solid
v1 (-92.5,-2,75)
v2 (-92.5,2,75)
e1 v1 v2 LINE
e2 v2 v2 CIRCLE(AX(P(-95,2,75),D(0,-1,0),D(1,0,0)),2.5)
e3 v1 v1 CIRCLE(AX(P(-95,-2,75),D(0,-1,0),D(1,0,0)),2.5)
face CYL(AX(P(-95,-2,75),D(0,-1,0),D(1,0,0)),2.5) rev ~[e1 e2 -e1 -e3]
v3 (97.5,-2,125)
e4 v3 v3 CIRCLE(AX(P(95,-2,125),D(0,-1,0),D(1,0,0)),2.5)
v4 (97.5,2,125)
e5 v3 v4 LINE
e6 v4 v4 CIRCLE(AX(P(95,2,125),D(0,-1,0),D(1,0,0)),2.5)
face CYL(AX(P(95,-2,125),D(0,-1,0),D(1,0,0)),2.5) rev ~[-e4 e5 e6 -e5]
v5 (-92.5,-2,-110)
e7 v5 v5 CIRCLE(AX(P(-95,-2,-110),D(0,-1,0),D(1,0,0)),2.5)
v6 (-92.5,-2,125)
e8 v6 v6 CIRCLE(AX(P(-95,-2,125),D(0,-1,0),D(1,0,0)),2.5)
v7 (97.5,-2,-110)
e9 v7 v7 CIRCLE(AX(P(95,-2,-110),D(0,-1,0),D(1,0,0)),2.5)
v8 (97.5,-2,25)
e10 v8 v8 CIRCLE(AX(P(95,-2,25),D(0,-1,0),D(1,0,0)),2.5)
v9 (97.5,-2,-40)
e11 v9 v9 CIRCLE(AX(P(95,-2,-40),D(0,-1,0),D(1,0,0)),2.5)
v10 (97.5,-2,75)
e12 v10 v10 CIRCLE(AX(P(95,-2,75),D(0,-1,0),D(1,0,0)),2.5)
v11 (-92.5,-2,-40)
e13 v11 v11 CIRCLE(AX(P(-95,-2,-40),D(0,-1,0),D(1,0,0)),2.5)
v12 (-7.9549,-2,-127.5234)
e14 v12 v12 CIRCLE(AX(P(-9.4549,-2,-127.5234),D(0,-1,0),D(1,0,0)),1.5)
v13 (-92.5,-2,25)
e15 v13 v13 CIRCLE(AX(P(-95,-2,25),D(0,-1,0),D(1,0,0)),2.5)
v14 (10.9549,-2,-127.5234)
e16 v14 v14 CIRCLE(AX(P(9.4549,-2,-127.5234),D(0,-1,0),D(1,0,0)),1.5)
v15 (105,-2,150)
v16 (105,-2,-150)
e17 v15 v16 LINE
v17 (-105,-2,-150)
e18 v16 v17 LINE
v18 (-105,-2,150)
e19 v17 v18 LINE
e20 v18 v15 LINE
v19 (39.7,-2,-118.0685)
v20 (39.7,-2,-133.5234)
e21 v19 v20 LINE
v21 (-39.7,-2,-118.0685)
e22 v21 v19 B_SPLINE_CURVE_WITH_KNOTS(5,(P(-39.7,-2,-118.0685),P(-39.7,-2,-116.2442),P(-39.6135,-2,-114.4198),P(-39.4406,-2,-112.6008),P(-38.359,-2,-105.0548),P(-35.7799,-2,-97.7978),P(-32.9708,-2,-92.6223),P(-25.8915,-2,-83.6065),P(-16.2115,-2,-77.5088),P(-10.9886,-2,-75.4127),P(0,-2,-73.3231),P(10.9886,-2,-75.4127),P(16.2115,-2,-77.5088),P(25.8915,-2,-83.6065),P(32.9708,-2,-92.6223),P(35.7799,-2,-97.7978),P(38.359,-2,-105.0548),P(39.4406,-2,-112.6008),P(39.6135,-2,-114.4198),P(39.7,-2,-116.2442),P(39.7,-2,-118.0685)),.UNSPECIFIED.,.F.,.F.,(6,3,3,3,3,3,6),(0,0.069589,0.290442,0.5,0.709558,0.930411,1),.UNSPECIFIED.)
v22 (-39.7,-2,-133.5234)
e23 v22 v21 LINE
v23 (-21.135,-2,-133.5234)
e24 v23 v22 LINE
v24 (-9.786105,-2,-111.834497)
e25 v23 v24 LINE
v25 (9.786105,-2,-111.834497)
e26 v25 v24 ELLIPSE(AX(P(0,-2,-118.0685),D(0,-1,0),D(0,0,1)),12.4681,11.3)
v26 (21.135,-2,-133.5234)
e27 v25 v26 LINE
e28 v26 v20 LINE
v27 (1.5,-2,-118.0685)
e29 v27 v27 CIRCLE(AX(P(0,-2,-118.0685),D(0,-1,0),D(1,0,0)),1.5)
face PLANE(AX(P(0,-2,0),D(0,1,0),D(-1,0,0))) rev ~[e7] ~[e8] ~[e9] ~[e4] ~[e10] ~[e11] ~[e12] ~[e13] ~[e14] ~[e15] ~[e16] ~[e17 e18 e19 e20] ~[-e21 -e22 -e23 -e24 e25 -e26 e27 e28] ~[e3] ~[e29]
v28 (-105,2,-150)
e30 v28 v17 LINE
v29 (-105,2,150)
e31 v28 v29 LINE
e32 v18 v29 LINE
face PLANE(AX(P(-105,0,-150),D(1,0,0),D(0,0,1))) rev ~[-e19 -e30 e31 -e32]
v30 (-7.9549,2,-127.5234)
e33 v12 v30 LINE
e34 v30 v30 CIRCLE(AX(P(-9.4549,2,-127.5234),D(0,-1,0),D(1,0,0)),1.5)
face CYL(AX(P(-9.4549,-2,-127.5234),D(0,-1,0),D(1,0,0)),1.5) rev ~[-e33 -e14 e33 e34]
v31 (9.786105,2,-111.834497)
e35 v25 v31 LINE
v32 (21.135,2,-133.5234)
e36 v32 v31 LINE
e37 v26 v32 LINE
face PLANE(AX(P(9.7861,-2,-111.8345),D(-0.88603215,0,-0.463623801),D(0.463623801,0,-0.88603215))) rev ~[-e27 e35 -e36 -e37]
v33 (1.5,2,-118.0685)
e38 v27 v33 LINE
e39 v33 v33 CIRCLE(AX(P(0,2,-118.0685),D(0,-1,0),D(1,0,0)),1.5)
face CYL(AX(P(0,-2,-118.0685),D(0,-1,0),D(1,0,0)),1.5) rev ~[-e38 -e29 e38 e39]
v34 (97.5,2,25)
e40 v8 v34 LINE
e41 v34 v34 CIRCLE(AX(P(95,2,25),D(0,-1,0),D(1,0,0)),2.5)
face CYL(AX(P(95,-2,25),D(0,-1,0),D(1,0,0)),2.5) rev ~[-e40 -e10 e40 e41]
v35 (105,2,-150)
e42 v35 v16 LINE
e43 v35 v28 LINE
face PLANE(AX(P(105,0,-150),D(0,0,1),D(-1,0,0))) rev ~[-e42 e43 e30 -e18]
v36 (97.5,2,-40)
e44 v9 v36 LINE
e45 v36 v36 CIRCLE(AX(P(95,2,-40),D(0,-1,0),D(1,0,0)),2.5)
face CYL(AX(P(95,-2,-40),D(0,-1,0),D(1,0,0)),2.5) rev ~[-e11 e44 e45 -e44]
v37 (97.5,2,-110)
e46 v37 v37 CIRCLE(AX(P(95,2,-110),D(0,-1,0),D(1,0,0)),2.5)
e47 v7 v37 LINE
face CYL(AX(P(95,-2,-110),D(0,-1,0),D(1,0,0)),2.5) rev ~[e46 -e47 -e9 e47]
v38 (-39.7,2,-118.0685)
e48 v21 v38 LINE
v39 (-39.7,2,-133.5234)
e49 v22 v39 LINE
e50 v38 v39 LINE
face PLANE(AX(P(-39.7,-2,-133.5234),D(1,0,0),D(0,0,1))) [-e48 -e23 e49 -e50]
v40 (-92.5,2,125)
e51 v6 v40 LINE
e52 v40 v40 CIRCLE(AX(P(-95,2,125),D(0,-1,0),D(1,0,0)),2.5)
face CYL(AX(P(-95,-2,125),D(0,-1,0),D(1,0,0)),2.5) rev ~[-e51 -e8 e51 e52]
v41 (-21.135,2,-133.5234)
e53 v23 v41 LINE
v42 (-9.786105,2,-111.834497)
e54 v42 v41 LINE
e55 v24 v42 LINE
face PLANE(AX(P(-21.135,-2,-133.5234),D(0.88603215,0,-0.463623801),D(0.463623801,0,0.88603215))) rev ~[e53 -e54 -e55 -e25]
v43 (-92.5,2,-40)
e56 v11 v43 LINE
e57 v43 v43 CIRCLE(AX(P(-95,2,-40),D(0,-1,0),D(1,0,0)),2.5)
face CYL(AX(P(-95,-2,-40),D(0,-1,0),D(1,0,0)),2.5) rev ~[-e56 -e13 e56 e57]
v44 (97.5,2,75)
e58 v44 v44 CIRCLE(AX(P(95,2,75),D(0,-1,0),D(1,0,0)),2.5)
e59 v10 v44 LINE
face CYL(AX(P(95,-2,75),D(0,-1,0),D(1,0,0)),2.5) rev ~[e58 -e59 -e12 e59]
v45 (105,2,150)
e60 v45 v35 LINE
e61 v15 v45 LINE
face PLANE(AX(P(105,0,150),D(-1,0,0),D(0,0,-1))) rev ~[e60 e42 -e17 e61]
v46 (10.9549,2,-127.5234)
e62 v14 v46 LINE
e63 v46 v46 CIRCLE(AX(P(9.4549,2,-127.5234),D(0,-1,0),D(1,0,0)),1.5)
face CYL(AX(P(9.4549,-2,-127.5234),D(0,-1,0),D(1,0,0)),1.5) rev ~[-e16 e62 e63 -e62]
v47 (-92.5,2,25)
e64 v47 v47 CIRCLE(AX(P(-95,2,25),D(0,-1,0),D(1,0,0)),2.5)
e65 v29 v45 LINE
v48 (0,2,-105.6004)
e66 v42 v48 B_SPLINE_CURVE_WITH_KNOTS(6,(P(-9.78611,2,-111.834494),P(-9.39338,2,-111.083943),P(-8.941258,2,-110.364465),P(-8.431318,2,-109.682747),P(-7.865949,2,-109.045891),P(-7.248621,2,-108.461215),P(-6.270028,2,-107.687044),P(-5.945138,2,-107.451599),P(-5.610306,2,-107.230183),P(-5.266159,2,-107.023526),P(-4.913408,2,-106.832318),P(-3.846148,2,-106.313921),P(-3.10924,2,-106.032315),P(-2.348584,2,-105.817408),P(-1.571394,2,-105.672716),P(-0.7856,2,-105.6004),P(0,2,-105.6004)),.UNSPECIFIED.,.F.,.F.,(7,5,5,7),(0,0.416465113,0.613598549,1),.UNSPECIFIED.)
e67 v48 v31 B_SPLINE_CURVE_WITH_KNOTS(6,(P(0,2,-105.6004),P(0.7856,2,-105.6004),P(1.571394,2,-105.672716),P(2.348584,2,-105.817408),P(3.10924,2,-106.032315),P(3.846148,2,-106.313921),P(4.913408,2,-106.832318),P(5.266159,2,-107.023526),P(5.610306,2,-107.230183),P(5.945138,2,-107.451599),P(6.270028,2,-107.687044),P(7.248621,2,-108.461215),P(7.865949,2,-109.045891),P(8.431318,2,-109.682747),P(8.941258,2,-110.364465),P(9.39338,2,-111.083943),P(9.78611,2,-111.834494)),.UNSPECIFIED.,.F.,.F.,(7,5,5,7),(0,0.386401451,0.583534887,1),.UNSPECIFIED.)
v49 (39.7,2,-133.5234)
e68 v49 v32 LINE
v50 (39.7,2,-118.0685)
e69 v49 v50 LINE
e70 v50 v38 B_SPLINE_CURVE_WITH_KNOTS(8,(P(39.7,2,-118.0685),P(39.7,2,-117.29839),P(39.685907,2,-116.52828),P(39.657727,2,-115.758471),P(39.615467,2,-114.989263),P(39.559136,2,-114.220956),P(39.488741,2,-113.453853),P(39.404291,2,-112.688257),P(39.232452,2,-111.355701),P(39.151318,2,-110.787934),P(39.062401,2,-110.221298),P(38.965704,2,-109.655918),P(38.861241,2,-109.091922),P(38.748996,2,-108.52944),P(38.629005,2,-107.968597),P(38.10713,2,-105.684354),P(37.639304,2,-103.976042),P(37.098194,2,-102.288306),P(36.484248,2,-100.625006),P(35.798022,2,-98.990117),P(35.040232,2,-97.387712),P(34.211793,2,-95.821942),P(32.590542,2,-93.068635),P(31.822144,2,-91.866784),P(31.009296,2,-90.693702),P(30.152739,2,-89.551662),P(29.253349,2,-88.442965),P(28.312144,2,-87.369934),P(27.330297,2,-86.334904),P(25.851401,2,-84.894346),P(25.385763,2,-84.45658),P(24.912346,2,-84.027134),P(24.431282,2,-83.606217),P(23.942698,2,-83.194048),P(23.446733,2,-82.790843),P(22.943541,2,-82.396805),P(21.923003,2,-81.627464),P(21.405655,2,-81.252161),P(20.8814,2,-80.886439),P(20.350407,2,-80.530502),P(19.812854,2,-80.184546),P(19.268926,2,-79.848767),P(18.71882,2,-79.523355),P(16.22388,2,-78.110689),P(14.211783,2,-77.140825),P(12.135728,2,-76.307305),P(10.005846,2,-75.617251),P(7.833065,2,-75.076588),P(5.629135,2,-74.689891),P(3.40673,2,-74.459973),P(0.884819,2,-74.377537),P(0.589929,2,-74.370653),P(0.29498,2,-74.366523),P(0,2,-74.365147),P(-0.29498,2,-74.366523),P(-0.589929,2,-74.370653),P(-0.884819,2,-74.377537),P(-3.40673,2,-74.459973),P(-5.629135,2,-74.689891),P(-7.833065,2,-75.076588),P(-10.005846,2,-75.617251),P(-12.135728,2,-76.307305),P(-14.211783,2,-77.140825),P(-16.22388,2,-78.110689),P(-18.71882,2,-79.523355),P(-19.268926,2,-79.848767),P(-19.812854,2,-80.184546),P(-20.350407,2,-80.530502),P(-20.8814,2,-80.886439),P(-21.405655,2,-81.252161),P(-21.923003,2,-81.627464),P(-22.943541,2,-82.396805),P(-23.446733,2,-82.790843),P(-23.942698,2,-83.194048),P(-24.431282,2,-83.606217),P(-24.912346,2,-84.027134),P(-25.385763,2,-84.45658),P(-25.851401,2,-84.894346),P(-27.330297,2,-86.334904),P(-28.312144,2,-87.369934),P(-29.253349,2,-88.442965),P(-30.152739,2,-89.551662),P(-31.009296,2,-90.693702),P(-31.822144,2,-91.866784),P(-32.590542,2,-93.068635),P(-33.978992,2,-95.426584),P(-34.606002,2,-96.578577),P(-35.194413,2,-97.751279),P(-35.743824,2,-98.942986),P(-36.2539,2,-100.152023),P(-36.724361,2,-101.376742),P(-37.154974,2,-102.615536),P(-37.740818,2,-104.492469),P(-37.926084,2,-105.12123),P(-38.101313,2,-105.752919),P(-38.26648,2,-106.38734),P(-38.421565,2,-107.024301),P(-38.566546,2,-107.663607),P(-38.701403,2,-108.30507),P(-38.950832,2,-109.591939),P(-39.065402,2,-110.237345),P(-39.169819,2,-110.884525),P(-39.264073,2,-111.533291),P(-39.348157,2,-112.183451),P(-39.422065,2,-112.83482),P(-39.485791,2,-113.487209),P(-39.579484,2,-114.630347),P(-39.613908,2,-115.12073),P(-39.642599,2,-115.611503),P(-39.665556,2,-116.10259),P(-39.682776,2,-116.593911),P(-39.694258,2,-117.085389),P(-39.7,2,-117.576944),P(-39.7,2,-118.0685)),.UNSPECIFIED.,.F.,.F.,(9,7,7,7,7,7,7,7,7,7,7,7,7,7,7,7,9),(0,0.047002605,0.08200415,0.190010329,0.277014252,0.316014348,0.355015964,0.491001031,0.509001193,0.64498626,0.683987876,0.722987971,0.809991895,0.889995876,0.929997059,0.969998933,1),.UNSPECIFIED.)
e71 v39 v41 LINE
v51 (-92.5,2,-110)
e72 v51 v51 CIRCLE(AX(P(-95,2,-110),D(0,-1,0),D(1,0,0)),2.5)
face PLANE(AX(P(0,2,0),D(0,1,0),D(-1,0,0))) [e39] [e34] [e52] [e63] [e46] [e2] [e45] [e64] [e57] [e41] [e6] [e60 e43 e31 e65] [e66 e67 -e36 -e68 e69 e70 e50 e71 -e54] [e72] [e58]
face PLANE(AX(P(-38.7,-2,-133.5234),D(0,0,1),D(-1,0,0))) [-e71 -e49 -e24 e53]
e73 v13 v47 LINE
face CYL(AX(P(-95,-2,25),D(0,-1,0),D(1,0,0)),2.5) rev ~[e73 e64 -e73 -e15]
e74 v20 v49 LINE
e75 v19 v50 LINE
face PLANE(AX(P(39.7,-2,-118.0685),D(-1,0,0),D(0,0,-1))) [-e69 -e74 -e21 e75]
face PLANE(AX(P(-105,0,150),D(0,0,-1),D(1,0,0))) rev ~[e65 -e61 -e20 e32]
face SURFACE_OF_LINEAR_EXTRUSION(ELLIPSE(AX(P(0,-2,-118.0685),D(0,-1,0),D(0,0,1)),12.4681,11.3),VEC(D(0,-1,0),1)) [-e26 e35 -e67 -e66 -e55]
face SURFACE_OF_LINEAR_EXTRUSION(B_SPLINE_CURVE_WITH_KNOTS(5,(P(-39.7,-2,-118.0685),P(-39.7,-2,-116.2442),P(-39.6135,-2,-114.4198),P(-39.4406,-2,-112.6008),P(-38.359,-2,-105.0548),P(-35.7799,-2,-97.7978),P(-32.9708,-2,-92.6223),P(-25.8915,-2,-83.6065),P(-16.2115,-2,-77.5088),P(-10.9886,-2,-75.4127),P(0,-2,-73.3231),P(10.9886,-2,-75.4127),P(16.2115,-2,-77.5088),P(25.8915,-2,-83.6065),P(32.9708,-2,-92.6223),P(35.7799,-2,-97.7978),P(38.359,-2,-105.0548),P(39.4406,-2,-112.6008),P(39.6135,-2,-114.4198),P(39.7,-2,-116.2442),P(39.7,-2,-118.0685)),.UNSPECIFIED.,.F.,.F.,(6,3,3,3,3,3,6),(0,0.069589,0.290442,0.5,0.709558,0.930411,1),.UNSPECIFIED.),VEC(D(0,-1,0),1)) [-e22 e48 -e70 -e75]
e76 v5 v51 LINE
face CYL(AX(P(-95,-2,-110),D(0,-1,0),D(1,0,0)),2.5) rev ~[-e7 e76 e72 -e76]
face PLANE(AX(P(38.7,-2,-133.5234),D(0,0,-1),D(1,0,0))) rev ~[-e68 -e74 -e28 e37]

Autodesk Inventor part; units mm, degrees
sketch "Эскиз2" plane through (0, 0, 0) normal (0, 1, 0) x (-1, 0, 0)
  line L0 (105, 150) -> (-105, 150)
  line L1 (-105, 150) -> (-105, -150)
  line L2 (-105, -150) -> (105, -150)
  line L3 (105, -150) -> (105, 150)
  line L4 (105, 150) -> (-105, -150) construction
  line L5 (-105, 150) -> (105, -150) construction
  point P0 (0, 0)
  dimension "d0" = 300
  dimension "d1" = 210
extrude "Выдавливание1" add sketch "Эскиз2" along normal mid plane 4
sketch "Эскиз4" plane through (0, 2, 0) normal (0, 1, 0) x (1, 0, 0)
  point P0 (0, 0)
sketch "Эскиз5" plane through (0, -2, 0) normal (0, -1, 0) x (1, 0, 0)
  line L0 (46.7, -140) -> (-46.7, -140) projected
  line L1 (-46.7, -140) -> (-46.7, -121.5234) projected
  arc A0 (-46.594, -118.6405) -> (-46.7, -121.5234) centre (-7.4334, -121.5237) ccw projected
  ellipse E0 centre (-51.6674, -118.2652) end of major axis (-52.1006, -124.2245) minor radius 5.0873 (-46.594, -118.6405) -> (-46.5935, -117.6187) ccw projected
  ellipse E1 centre (-32.0119, -116.0476) end of major axis (-31.7353, -98.7858) minor radius 14.6347 (-46.6171, -115.0294) -> (-46.5935, -117.6187) ccw projected
  spline S0 degree 3 poles (-46.6171, -115.0294) (-46.5015, -112.9122) (-46.0285, -108.6931) (-44.8405, -103.5371) (-43.2174, -98.5282) (-41.5773, -94.6618) (-39.1217, -90.0608) (-36.8431, -86.5874) (-33.6324, -82.5567) (-30.7879, -79.6008) (-26.9267, -76.2879) (-23.6107, -73.9602) (-19.2299, -71.4921) (-15.5575, -69.8842) (-10.8129, -68.3603) (-6.9178, -67.5387) (-1.9855, -67.0233) (1.9855, -67.0233) (6.9178, -67.5387) (10.8129, -68.3603) (15.5575, -69.8842) (19.2299, -71.4921) (23.6107, -73.9602) (26.9267, -76.2879) (30.7879, -79.6008) (33.6324, -82.5567) (36.8431, -86.5874) (39.1217, -90.0608) (41.5773, -94.6618) (43.2174, -98.5282) (44.8405, -103.5371) (46.0285, -108.6931) (46.5015, -112.9122) (46.6171, -115.0294) knots 1.630961 1.630961 1.630961 1.630961 1.756847 1.882733 1.945676 2.071562 2.134505 2.260391 2.323334 2.44922 2.512163 2.638049 2.700992 2.826878 2.889821 3.015707 3.07865 3.204536 3.267479 3.393365 3.456308 3.582194 3.645137 3.771023 3.833966 3.959852 4.022795 4.148681 4.211624 4.33751 4.400453 4.526339 4.652225 4.652225 4.652225 4.652225 projected
  ellipse E2 centre (32.0119, -116.0476) end of major axis (31.7353, -98.7858) minor radius 14.6347 (46.5935, -117.6187) -> (46.6171, -115.0294) ccw projected
  ellipse E3 centre (51.6674, -118.2652) end of major axis (52.1006, -124.2245) minor radius 5.0873 (46.5935, -117.6187) -> (46.594, -118.6405) ccw projected
  arc A1 (46.7, -121.5234) -> (46.594, -118.6405) centre (7.4334, -121.5237) ccw projected
  line L2 (46.7, -121.5234) -> (46.7, -140) projected
  line L3 (38.7, -118.0685) -> (38.7, -133.5234) projected
  ellipse E4 centre (0, -118.0685) end of major axis (0, -75.3678) minor radius 38.7 (38.7, -118.0685) -> (-38.7, -118.0685) ccw projected
  line L4 (-38.7, -133.5234) -> (-38.7, -118.0685) projected
  line L5 (-21.135, -133.5234) -> (-38.7, -133.5234) projected
  circle A2 centre (9.4549, -127.5234) radius 2.1 projected
  circle A3 centre (0, -118.0685) radius 2.1 projected
  circle A4 centre (-9.4549, -127.5234) radius 2.1 projected
  circle A5 centre (9.4549, -127.5234) radius 1.5
  circle A6 centre (-9.4549, -127.5234) radius 1.5
  circle A7 centre (0, -118.0685) radius 1.5
  line L6 (39.7, -118.0685) -> (39.7, -134.4459)
  line L7 (-39.7, -133.5234) -> (-39.7, -118.0685)
  line L8 (38.7, -133.5234) -> (39.7, -133.5234)
  line L9 (-38.7, -133.5234) -> (-39.7, -133.5234)
  line L10 (38.7, -133.5234) -> (21.135, -133.5234) projected
  line L11 (9.7861, -111.8345) -> (21.135, -133.5234) projected
  ellipse E5 centre (0, -118.0685) end of major axis (0, -105.6004) minor radius 11.3 (9.7861, -111.8345) -> (-9.7861, -111.8345) ccw projected
  line L12 (-21.135, -133.5234) -> (-9.7861, -111.8345) projected
  spline S1 degree 5 poles (-39.7, -118.0685) (-39.7, -116.2442) (-39.6135, -114.4198) (-39.4406, -112.6008) (-38.359, -105.0548) (-35.7799, -97.7978) (-32.9708, -92.6223) (-25.8915, -83.6065) (-16.2115, -77.5088) (-10.9886, -75.4127) (0, -73.3231) (10.9886, -75.4127) (16.2115, -77.5088) (25.8915, -83.6065) (32.9708, -92.6223) (35.7799, -97.7978) (38.359, -105.0548) (39.4406, -112.6008) (39.6135, -114.4198) (39.7, -116.2442) (39.7, -118.0685) knots 0 0 0 0 0 0 0.069589 0.069589 0.069589 0.290442 0.290442 0.290442 0.5 0.5 0.5 0.709558 0.709558 0.709558 0.930411 0.930411 0.930411 1 1 1 1 1 1
  point P0 (0, 0)
  dimension "d18" = 1
  dimension "d15" = 3
  dimension "d16" = 3
  dimension "d17" = 3
extrude "Выдавливание3" cut sketch "Эскиз5" against normal blind 10 contours E4 L4 L9 L7 S1 L6 L8 L3 | L3 L10 L11 E5 L12 L5 L4 E4 | A5 | A6 | A7
sketch "Эскиз6" plane through (0, -2, 0) normal (0, -1, 0) x (1, 0, 0)
  circle A0 centre (95, -110) radius 2.5
  circle A1 centre (95, -40) radius 2.5
  circle A2 centre (95, 25) radius 2.5
  circle A3 centre (95, 75) radius 2.5
  circle A4 centre (95, 125) radius 2.5
  circle A5 centre (-95, -110) radius 2.5
  circle A6 centre (-95, -40) radius 2.5
  circle A7 centre (-95, 25) radius 2.5
  circle A8 centre (-95, 75) radius 2.5
  circle A9 centre (-95, 125) radius 2.5
  point P0 (0, 0)
extrude "Выдавливание4" cut sketch "Эскиз6" against normal up to next
properties part number "Передняя_фанера"
